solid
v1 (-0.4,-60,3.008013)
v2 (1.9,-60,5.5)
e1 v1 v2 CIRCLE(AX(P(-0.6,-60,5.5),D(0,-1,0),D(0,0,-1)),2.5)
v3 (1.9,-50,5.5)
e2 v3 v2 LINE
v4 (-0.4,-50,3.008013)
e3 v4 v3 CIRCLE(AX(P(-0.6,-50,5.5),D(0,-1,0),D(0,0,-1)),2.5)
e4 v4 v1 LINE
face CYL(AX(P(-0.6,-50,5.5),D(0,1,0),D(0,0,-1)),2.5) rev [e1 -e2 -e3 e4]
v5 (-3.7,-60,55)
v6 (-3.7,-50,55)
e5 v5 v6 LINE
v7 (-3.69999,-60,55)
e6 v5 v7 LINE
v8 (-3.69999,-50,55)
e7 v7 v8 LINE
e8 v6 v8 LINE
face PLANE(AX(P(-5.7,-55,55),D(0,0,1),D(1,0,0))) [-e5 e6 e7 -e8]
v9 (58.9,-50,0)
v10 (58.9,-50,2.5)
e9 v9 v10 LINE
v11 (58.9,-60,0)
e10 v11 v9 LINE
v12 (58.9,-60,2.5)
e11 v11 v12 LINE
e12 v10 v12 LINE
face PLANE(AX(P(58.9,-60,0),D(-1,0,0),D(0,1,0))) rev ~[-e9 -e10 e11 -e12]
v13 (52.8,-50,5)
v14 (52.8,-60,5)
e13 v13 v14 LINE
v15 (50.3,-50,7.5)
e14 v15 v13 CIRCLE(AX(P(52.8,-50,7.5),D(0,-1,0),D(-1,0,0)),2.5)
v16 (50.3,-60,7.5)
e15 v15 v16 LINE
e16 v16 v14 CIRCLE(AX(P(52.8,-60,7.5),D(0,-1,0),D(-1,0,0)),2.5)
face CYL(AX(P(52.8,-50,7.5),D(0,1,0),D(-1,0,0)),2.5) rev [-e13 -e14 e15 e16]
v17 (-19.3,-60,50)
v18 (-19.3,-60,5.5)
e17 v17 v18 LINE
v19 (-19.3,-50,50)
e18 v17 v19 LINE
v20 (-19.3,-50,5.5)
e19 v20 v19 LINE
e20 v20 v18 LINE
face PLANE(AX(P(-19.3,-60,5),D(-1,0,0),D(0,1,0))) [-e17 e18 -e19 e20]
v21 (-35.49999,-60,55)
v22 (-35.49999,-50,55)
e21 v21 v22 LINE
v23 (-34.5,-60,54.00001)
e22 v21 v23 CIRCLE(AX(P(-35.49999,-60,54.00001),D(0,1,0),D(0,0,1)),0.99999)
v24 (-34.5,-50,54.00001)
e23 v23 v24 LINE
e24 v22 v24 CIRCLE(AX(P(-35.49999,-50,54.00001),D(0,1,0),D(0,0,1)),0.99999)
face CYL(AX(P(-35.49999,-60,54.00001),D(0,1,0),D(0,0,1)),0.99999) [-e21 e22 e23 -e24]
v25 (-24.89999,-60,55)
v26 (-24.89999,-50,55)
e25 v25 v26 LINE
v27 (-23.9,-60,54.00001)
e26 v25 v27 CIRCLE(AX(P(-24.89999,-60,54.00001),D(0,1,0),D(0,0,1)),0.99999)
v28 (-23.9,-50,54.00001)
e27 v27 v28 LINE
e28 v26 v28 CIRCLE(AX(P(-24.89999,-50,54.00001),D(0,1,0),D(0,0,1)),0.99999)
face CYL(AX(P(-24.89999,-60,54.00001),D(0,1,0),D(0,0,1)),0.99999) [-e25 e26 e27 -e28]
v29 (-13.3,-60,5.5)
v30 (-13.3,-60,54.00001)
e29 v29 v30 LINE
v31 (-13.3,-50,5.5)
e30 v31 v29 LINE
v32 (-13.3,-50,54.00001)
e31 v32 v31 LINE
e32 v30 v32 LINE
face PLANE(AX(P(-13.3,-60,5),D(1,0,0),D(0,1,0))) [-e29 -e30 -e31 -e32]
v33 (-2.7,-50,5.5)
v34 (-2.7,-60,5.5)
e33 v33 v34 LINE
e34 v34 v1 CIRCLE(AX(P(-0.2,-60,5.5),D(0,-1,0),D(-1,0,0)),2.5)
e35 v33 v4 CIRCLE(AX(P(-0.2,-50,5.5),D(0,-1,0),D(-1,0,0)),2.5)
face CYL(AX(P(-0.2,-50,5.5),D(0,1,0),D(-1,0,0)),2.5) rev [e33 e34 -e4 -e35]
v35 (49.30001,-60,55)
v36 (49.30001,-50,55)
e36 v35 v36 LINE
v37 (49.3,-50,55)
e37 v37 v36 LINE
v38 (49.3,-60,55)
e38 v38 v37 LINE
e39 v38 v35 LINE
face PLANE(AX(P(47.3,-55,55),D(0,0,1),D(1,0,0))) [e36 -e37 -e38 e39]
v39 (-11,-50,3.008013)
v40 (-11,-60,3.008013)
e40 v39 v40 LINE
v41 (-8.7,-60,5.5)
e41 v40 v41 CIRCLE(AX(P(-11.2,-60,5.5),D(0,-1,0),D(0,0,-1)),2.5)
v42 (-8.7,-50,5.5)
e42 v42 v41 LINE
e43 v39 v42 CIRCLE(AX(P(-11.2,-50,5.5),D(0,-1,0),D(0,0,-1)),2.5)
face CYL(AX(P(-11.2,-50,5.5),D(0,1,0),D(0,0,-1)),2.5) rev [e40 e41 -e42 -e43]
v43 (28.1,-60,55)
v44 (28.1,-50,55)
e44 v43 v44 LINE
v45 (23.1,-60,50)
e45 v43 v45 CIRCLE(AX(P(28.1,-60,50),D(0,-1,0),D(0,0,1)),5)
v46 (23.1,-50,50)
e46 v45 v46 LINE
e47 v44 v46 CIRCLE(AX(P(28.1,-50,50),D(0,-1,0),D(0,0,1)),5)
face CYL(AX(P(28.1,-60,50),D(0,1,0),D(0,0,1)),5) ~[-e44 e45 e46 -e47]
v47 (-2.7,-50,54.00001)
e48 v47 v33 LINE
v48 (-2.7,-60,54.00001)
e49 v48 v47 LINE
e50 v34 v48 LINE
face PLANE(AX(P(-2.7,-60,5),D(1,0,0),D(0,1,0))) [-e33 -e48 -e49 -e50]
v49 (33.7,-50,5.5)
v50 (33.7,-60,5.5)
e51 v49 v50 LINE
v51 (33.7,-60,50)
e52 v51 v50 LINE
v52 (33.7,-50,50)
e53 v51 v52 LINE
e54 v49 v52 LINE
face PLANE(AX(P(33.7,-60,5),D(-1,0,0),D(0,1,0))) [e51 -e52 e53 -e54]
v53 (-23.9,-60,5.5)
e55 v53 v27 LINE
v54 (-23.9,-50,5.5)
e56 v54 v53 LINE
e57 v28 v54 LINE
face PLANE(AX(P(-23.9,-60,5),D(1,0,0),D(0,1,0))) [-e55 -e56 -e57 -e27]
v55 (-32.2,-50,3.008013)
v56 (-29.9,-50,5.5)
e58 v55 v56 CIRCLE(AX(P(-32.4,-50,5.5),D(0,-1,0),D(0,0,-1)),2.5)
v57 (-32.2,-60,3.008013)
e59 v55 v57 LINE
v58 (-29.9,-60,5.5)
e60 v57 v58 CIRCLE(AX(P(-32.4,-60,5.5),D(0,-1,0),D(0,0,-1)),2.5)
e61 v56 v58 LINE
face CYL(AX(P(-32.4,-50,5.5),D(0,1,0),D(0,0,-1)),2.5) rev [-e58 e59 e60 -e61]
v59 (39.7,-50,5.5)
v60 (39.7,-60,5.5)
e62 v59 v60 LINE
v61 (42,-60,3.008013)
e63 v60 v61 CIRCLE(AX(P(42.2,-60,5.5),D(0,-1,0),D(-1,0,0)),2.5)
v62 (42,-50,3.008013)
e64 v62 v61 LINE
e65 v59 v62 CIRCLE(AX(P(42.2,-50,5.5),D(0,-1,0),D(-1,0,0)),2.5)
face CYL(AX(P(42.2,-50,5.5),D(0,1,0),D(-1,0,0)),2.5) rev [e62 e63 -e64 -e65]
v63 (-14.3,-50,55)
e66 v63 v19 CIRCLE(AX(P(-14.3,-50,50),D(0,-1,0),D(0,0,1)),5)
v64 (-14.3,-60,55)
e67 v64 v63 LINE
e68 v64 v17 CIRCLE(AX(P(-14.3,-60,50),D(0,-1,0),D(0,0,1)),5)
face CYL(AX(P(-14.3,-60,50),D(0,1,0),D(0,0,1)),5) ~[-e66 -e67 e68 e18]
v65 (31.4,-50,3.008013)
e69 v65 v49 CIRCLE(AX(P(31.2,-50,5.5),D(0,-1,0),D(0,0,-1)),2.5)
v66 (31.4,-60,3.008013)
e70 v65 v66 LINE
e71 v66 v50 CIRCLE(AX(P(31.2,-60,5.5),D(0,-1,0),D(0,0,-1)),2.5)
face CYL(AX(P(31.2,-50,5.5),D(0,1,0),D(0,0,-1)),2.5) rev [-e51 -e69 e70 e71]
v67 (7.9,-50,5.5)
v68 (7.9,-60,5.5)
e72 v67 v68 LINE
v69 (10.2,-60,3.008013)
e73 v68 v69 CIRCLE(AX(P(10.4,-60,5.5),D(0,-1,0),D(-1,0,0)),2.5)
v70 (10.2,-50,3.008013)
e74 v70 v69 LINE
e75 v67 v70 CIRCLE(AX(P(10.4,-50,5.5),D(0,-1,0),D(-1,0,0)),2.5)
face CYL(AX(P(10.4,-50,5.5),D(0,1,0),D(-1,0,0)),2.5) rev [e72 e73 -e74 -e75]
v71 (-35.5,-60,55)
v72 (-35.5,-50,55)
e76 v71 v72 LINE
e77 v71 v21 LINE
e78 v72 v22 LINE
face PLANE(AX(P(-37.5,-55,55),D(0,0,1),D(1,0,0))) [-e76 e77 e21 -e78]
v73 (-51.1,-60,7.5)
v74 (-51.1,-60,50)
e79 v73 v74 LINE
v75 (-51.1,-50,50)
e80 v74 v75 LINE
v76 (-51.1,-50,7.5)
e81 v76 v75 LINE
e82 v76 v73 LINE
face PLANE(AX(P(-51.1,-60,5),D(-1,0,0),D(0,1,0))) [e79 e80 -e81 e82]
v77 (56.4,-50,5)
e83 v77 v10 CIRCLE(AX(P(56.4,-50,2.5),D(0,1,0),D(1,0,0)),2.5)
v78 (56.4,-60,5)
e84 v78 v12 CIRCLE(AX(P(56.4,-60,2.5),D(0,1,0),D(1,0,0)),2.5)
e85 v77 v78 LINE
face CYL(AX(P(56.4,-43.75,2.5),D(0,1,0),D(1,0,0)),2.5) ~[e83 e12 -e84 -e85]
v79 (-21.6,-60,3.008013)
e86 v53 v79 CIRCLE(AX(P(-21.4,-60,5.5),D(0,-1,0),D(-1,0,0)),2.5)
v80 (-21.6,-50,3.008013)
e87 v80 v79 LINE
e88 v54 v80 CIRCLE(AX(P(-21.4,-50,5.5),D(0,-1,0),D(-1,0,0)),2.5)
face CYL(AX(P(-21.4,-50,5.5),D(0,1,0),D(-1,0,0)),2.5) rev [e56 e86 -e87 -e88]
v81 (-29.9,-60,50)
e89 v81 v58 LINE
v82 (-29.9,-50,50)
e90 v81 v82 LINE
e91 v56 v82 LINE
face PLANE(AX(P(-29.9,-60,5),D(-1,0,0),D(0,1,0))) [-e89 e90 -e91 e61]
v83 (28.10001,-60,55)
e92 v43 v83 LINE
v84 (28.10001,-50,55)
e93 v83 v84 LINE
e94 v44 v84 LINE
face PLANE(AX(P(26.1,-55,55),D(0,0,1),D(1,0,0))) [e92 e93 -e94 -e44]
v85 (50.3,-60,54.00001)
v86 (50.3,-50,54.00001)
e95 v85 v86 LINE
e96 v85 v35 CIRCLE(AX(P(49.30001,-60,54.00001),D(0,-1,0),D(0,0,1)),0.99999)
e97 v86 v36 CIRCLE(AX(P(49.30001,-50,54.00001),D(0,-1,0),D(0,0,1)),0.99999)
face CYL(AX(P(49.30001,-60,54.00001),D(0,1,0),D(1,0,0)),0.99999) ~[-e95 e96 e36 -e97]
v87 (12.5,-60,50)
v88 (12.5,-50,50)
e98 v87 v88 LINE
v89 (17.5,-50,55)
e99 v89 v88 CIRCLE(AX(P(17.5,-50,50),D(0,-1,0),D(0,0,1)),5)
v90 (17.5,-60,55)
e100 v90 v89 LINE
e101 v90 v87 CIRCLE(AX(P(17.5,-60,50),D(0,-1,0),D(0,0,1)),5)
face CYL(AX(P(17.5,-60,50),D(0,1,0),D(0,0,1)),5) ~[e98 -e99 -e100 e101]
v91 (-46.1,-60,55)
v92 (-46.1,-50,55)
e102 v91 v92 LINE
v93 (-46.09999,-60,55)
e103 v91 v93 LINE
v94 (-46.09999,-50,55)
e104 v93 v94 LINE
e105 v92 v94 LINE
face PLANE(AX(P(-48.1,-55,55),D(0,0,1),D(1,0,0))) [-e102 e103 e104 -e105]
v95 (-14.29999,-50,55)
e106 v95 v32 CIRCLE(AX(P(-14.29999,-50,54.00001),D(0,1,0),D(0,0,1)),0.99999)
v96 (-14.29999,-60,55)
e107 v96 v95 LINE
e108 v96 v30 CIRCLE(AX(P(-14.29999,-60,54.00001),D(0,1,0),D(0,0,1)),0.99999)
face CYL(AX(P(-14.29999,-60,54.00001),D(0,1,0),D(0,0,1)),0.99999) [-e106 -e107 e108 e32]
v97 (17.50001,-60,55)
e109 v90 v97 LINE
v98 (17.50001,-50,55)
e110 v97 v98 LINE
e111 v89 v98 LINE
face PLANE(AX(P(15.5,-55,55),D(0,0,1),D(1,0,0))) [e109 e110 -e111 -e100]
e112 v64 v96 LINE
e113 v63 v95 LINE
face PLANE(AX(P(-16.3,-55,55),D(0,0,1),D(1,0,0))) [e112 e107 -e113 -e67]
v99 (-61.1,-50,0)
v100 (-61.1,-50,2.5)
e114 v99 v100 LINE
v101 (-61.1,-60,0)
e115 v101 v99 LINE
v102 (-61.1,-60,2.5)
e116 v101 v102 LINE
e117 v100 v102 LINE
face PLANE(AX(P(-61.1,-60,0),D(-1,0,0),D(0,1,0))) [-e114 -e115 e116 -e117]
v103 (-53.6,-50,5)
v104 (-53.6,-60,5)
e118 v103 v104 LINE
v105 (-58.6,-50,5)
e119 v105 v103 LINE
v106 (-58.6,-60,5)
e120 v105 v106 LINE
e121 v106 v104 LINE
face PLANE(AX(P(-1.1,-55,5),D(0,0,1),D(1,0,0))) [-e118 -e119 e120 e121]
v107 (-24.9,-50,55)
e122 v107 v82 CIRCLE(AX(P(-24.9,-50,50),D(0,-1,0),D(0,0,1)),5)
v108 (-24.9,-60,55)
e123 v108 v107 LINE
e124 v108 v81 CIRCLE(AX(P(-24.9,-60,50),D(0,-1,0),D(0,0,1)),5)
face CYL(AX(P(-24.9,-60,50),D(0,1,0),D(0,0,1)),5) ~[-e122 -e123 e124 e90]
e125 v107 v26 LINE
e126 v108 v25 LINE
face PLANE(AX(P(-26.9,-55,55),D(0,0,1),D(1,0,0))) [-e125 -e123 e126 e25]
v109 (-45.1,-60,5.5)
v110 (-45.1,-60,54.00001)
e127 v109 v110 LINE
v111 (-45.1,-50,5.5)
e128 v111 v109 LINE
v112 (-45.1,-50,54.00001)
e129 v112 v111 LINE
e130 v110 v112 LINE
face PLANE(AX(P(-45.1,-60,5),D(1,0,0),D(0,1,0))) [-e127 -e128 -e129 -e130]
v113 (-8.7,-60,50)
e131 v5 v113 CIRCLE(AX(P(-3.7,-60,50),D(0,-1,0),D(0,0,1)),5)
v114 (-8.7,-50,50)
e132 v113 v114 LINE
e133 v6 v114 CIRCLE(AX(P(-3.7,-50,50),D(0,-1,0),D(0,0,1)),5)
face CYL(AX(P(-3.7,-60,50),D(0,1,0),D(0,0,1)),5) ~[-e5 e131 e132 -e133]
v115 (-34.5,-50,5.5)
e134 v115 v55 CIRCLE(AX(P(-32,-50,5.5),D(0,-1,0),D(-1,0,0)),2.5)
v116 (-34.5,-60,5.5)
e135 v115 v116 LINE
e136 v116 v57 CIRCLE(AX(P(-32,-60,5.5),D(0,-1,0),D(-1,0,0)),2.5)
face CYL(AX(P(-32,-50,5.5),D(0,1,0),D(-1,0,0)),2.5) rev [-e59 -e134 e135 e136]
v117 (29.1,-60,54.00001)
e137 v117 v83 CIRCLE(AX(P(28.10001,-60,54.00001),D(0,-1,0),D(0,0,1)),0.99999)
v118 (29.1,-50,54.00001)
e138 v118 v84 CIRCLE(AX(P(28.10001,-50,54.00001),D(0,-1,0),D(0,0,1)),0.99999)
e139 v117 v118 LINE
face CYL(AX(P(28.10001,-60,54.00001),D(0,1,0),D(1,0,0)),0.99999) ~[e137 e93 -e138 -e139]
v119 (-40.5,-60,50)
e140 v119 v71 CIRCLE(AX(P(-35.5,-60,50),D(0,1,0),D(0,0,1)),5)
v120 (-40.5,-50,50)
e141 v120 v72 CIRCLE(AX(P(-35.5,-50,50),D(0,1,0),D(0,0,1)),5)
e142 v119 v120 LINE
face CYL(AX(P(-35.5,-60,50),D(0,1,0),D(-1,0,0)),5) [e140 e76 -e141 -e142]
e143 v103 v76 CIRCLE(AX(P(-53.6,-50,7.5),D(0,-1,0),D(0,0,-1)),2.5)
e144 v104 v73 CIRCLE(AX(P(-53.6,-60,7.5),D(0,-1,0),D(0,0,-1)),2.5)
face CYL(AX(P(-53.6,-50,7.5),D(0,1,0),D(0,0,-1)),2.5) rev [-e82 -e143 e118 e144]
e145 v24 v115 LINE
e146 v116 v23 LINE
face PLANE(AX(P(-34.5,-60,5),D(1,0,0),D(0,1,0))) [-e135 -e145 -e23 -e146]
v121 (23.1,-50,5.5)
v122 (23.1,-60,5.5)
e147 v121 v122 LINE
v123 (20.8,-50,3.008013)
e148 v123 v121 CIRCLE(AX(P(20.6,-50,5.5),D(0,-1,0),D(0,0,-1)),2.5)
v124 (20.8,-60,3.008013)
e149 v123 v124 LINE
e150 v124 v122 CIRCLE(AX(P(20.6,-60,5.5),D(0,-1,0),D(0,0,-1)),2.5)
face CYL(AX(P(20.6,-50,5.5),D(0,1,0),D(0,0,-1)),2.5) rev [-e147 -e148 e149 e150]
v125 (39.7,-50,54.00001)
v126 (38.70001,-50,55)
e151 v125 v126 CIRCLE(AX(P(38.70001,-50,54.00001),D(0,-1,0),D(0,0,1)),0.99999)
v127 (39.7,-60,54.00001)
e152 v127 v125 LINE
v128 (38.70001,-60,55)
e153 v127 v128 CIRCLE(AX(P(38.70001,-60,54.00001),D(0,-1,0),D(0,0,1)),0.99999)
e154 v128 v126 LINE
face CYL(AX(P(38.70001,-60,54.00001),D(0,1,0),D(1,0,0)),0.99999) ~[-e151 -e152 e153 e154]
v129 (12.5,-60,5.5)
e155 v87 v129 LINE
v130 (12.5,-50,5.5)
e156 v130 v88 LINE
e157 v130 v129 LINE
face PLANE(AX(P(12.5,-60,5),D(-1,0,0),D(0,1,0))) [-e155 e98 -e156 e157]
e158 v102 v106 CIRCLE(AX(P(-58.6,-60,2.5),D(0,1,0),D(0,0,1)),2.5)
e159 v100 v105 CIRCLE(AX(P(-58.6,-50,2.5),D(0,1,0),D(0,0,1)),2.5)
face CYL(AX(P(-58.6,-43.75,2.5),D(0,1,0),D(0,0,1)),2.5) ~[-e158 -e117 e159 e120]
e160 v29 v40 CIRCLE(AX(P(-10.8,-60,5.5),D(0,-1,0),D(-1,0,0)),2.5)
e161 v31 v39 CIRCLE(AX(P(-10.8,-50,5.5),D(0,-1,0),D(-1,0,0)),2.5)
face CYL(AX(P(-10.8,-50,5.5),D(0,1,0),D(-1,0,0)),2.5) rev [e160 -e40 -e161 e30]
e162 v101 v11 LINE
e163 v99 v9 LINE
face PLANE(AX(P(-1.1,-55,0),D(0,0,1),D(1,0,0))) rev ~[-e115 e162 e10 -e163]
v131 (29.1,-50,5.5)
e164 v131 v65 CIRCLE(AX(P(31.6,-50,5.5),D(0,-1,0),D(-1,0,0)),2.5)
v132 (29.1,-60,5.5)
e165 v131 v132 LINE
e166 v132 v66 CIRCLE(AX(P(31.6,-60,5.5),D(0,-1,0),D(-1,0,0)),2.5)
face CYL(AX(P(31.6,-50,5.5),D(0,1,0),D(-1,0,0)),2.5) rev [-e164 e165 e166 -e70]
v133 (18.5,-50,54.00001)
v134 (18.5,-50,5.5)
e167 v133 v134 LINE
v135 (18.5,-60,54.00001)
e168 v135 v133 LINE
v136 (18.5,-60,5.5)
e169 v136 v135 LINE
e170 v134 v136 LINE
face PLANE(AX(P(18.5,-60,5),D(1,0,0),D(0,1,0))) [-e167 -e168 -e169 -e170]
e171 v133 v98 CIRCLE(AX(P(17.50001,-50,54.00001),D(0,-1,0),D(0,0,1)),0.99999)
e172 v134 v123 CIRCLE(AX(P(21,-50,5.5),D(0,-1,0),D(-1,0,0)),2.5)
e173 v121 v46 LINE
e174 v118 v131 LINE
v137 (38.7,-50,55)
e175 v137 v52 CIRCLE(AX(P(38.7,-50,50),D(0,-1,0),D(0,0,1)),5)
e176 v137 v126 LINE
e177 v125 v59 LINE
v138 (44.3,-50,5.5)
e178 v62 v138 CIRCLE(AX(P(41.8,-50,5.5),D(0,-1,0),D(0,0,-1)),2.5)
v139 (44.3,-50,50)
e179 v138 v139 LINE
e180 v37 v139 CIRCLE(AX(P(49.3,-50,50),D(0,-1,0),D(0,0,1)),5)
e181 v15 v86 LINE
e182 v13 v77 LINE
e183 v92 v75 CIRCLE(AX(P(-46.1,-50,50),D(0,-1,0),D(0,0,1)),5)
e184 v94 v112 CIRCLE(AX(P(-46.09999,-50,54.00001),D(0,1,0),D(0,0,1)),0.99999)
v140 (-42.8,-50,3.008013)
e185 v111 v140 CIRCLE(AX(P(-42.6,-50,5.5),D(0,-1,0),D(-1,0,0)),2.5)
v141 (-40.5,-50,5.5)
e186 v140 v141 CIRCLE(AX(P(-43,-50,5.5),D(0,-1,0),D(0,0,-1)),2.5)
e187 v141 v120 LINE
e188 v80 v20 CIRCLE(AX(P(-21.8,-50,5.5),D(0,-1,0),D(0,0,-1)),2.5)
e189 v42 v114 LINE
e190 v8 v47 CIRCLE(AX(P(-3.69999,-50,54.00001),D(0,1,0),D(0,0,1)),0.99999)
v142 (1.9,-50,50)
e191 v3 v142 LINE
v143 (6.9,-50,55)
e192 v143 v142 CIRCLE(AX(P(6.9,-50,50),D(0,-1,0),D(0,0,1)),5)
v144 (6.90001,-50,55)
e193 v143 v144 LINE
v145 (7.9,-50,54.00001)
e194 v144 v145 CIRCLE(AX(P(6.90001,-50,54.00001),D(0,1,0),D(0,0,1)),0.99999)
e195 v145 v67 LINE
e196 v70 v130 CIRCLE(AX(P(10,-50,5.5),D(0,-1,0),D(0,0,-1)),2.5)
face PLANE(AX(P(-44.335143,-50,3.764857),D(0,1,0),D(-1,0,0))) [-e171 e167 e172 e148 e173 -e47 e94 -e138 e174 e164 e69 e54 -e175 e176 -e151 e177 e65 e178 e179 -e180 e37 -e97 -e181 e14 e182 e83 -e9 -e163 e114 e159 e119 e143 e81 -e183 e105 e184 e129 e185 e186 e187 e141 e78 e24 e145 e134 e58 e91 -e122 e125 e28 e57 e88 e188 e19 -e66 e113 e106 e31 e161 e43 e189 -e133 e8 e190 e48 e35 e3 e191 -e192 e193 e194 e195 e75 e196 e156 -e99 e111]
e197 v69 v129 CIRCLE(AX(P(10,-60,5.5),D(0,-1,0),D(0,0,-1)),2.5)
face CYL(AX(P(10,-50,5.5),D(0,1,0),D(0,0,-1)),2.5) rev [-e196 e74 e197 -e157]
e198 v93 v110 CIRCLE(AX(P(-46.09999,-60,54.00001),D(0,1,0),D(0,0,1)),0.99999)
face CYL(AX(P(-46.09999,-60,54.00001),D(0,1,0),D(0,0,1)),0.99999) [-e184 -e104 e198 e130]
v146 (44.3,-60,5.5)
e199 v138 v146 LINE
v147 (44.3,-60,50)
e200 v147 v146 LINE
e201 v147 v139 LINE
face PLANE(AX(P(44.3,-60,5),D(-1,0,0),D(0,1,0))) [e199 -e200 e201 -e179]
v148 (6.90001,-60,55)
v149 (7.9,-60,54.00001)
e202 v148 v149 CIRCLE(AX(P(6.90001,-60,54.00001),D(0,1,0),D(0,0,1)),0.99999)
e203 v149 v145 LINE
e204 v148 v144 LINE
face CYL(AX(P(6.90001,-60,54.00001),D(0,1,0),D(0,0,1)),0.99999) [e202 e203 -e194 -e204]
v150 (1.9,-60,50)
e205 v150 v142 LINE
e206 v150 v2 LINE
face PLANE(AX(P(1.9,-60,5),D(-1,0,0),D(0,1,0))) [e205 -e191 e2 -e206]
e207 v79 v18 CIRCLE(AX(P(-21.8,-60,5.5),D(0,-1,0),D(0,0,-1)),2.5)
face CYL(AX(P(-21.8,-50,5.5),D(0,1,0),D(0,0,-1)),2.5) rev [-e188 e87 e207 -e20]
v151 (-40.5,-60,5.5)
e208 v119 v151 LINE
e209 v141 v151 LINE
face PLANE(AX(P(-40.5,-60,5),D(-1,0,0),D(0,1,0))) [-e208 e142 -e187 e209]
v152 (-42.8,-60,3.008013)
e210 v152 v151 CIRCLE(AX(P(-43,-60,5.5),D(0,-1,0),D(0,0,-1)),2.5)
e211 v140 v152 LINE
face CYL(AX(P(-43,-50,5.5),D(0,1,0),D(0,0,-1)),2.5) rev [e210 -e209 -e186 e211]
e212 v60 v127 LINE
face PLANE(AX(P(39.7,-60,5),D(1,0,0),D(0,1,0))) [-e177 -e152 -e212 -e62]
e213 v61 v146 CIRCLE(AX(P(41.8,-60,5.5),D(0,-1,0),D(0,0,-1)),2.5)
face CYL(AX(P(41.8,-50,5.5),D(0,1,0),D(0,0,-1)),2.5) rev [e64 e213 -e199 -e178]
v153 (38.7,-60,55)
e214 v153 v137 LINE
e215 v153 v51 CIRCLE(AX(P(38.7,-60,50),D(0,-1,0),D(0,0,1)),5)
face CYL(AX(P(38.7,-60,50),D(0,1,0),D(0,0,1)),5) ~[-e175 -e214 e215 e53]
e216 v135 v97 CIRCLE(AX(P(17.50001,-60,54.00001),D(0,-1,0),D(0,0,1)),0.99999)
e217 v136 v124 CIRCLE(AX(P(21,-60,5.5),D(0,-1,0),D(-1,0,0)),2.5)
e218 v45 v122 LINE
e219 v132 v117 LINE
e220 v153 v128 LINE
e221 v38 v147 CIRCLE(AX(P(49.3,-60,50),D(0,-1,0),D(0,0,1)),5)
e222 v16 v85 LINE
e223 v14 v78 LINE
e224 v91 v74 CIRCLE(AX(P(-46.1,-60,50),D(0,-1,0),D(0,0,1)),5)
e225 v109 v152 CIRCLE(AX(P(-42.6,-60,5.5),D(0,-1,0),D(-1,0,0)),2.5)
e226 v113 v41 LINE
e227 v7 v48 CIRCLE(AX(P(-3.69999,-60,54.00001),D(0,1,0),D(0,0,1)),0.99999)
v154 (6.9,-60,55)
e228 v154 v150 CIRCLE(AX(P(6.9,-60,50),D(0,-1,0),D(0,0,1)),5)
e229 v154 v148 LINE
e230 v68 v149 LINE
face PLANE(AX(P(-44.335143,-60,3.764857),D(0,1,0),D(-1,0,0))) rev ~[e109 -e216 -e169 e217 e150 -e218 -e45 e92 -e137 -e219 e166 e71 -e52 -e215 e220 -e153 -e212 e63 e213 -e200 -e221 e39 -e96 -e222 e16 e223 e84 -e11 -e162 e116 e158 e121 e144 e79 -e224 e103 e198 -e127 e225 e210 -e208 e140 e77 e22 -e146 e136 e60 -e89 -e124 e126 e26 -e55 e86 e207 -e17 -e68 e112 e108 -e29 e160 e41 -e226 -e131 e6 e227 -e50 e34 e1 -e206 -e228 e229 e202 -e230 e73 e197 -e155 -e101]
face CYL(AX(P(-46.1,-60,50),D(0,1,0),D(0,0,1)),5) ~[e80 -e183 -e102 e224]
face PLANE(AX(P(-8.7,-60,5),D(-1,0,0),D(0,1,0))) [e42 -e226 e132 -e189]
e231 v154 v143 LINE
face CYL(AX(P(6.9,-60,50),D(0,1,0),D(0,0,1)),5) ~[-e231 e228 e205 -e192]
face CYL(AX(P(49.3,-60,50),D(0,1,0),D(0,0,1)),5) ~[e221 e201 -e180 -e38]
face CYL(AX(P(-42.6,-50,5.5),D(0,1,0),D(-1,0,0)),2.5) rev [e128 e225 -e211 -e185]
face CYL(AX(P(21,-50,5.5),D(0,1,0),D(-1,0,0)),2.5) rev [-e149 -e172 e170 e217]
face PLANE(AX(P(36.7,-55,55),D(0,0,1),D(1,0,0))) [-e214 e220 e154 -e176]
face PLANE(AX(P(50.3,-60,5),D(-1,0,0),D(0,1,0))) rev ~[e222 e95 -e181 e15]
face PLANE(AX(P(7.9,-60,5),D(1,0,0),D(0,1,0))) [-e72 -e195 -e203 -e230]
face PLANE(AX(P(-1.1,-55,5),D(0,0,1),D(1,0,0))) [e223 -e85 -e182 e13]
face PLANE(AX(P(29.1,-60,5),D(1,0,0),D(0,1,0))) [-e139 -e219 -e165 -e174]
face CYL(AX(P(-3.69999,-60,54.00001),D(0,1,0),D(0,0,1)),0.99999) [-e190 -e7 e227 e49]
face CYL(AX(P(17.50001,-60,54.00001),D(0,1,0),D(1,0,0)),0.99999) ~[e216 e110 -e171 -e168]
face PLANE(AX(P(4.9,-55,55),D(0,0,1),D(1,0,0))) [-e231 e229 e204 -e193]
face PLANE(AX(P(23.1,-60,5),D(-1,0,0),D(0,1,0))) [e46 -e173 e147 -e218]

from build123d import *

# Parameters (mm, degrees)
F0_W        = 120
F0_H        = 10
F1_DEPTH    = 5
F2_W        = 6
F2_H        = 10
F3_DEPTH    = 50
F4_W        = 4.6
F4_H        = 10
F5_DEPTH    = 2
F6_T1_DEPTH = 10
F6_T3_DEPTH = 22.5
F7_R        = 5
F8_R        = 0.99999


# Not quite as in the source:
# - a fillet or chamfer that OpenCascade refuses, or shapes differently, is made with other operations: its cross-section is extruded or revolved along the edge and cut away or added
# - a fillet or chamfer is up to 0.001 mm smaller than in the source, because OpenCascade refuses the exact size


with BuildPart() as f1:
    # F0 (on Top) → F1 (new body)
    with BuildSketch(Plane.XY):
        with Locations((-1.1, -55)):
            Rectangle(F0_W, F0_H)
    extrude(amount=F1_DEPTH)

    # F2 (on face) → F3 (join)
    with BuildSketch(Plane.XY.offset(5)):
        with Locations((-48.1, -55)):
            Rectangle(F2_W, F2_H)
        with Locations((-37.5, -55)):
            Rectangle(F2_W, F2_H)
        with Locations((-26.9, -55)):
            Rectangle(F2_W, F2_H)
        with Locations((-16.3, -55)):
            Rectangle(F2_W, F2_H)
        with Locations((-5.7, -55)):
            Rectangle(F2_W, F2_H)
        with Locations((4.9, -55)):
            Rectangle(F2_W, F2_H)
        with Locations((15.5, -55)):
            Rectangle(F2_W, F2_H)
        with Locations((26.1, -55)):
            Rectangle(F2_W, F2_H)
        with Locations((36.7, -55)):
            Rectangle(F2_W, F2_H)
        with Locations((47.3, -55)):
            Rectangle(F2_W, F2_H)
    extrude(amount=F3_DEPTH)

    # F4 (on face) → F5 (cut)
    with BuildSketch(Plane.XY.offset(5)):
        with Locations((-42.8, -55)):
            Rectangle(F4_W, F4_H)
        with Locations((-32.2, -55)):
            Rectangle(F4_W, F4_H)
        with Locations((-21.6, -55)):
            Rectangle(F4_W, F4_H)
        with Locations((-11, -55)):
            Rectangle(F4_W, F4_H)
        with Locations((-0.4, -55)):
            Rectangle(F4_W, F4_H)
        with Locations((10.2, -55)):
            Rectangle(F4_W, F4_H)
        with Locations((20.8, -55)):
            Rectangle(F4_W, F4_H)
        with Locations((31.4, -55)):
            Rectangle(F4_W, F4_H)
        with Locations((42, -55)):
            Rectangle(F4_W, F4_H)
    extrude(amount=-F5_DEPTH, mode=Mode.SUBTRACT)

    # F6: fillet of radius 2.5 on 22 edges, made by hand

    # F6_s2 → F6_t1 (join)
    with BuildSketch(Plane.XZ.offset(50)):
        with BuildLine():
            ThreePointArc((-45.1, 5.5), (-44.367766953, 3.732233047), (-42.6, 3))
            Line((-42.6, 3), (-45.1, 3))
            Line((-45.1, 3), (-45.1, 5.5))
        make_face()
        with BuildLine():
            ThreePointArc((-43, 3), (-41.232233047, 3.732233047), (-40.5, 5.5))
            Line((-40.5, 5.5), (-40.5, 3))
            Line((-40.5, 3), (-43, 3))
        make_face()
        with BuildLine():
            ThreePointArc((-32.4, 3), (-30.632233047, 3.732233047), (-29.9, 5.5))
            Line((-29.9, 5.5), (-29.9, 3))
            Line((-29.9, 3), (-32.4, 3))
        make_face()
        with BuildLine():
            ThreePointArc((-23.9, 5.5), (-23.167766953, 3.732233047), (-21.4, 3))
            Line((-21.4, 3), (-23.9, 3))
            Line((-23.9, 3), (-23.9, 5.5))
        make_face()
        with BuildLine():
            ThreePointArc((-21.8, 3), (-20.032233047, 3.732233047), (-19.3, 5.5))
            Line((-19.3, 5.5), (-19.3, 3))
            Line((-19.3, 3), (-21.8, 3))
        make_face()
        with BuildLine():
            ThreePointArc((-13.3, 5.5), (-12.567766953, 3.732233047), (-10.8, 3))
            Line((-10.8, 3), (-13.3, 3))
            Line((-13.3, 3), (-13.3, 5.5))
        make_face()
        with BuildLine():
            ThreePointArc((-11.2, 3), (-9.432233047, 3.732233047), (-8.7, 5.5))
            Line((-8.7, 5.5), (-8.7, 3))
            Line((-8.7, 3), (-11.2, 3))
        make_face()
        with BuildLine():
            ThreePointArc((-2.7, 5.5), (-1.967766953, 3.732233047), (-0.2, 3))
            Line((-0.2, 3), (-2.7, 3))
            Line((-2.7, 3), (-2.7, 5.5))
        make_face()
        with BuildLine():
            ThreePointArc((-0.6, 3), (1.167766953, 3.732233047), (1.9, 5.5))
            Line((1.9, 5.5), (1.9, 3))
            Line((1.9, 3), (-0.6, 3))
        make_face()
        with BuildLine():
            ThreePointArc((10, 3), (11.767766953, 3.732233047), (12.5, 5.5))
            Line((12.5, 5.5), (12.5, 3))
            Line((12.5, 3), (10, 3))
        make_face()
        with BuildLine():
            ThreePointArc((20.6, 3), (22.367766953, 3.732233047), (23.1, 5.5))
            Line((23.1, 5.5), (23.1, 3))
            Line((23.1, 3), (20.6, 3))
        make_face()
        with BuildLine():
            ThreePointArc((31.2, 3), (32.967766953, 3.732233047), (33.7, 5.5))
            Line((33.7, 5.5), (33.7, 3))
            Line((33.7, 3), (31.2, 3))
        make_face()
        with BuildLine():
            ThreePointArc((41.8, 3), (43.567766953, 3.732233047), (44.3, 5.5))
            Line((44.3, 5.5), (44.3, 3))
            Line((44.3, 3), (41.8, 3))
        make_face()
        with BuildLine():
            ThreePointArc((39.7, 5.5), (40.432233047, 3.732233047), (42.2, 3))
            Line((42.2, 3), (39.7, 3))
            Line((39.7, 3), (39.7, 5.5))
        make_face()
        with BuildLine():
            ThreePointArc((29.1, 5.5), (29.832233047, 3.732233047), (31.6, 3))
            Line((31.6, 3), (29.1, 3))
            Line((29.1, 3), (29.1, 5.5))
        make_face()
        with BuildLine():
            ThreePointArc((18.5, 5.5), (19.232233047, 3.732233047), (21, 3))
            Line((21, 3), (18.5, 3))
            Line((18.5, 3), (18.5, 5.5))
        make_face()
        with BuildLine():
            ThreePointArc((7.9, 5.5), (8.632233047, 3.732233047), (10.4, 3))
            Line((10.4, 3), (7.9, 3))
            Line((7.9, 3), (7.9, 5.5))
        make_face()
        with BuildLine():
            ThreePointArc((50.3, 7.5), (51.032233047, 5.732233047), (52.8, 5))
            Line((52.8, 5), (50.3, 5))
            Line((50.3, 5), (50.3, 7.5))
        make_face()
        with BuildLine():
            ThreePointArc((-53.6, 5), (-51.832233047, 5.732233047), (-51.1, 7.5))
            Line((-51.1, 7.5), (-51.1, 5))
            Line((-51.1, 5), (-53.6, 5))
        make_face()
        with BuildLine():
            ThreePointArc((-34.5, 5.5), (-33.767766953, 3.732233047), (-32, 3))
            Line((-32, 3), (-34.5, 3))
            Line((-34.5, 3), (-34.5, 5.5))
        make_face()
    extrude(amount=F6_T1_DEPTH)

    # F6_s4 → F6_t3 (cut)
    with BuildSketch(Plane.XZ.offset(43.75)):
        with BuildLine():
            ThreePointArc((58.9, 2.5), (58.167766953, 4.267766953), (56.4, 5))
            Line((56.4, 5), (58.9, 5))
            Line((58.9, 5), (58.9, 2.5))
        make_face()
        with BuildLine():
            ThreePointArc((-58.6, 5), (-60.367766953, 4.267766953), (-61.1, 2.5))
            Line((-61.1, 2.5), (-61.1, 5))
            Line((-61.1, 5), (-58.6, 5))
        make_face()
    extrude(amount=F6_T3_DEPTH, mode=Mode.SUBTRACT)

    # F7
    f7_edges = [f1.edges().sort_by_distance(p)[0] for p in [
        (-51.1, -55, 55),
        (-40.5, -55, 55),
        (-29.9, -55, 55),
        (-19.3, -55, 55),
        (-8.7, -55, 55),
        (1.9, -55, 55),
        (12.5, -55, 55),
        (23.1, -55, 55),
        (33.7, -55, 55),
        (44.3, -55, 55),
    ]]
    fillet(f7_edges, radius=F7_R)

    # F8 (radius 1 in the source; OpenCascade refuses exactly that, so slightly less here)
    f8_edges = [f1.edges().sort_by_distance(p)[0] for p in [
        (-45.1, -55, 55),
        (-34.5, -55, 55),
        (-23.9, -55, 55),
        (-13.3, -55, 55),
        (-2.7, -55, 55),
        (7.9, -55, 55),
        (18.5, -55, 55),
        (29.1, -55, 55),
        (39.7, -55, 55),
        (50.3, -55, 55),
    ]]
    fillet(f8_edges, radius=F8_R)


solid = f1.part
